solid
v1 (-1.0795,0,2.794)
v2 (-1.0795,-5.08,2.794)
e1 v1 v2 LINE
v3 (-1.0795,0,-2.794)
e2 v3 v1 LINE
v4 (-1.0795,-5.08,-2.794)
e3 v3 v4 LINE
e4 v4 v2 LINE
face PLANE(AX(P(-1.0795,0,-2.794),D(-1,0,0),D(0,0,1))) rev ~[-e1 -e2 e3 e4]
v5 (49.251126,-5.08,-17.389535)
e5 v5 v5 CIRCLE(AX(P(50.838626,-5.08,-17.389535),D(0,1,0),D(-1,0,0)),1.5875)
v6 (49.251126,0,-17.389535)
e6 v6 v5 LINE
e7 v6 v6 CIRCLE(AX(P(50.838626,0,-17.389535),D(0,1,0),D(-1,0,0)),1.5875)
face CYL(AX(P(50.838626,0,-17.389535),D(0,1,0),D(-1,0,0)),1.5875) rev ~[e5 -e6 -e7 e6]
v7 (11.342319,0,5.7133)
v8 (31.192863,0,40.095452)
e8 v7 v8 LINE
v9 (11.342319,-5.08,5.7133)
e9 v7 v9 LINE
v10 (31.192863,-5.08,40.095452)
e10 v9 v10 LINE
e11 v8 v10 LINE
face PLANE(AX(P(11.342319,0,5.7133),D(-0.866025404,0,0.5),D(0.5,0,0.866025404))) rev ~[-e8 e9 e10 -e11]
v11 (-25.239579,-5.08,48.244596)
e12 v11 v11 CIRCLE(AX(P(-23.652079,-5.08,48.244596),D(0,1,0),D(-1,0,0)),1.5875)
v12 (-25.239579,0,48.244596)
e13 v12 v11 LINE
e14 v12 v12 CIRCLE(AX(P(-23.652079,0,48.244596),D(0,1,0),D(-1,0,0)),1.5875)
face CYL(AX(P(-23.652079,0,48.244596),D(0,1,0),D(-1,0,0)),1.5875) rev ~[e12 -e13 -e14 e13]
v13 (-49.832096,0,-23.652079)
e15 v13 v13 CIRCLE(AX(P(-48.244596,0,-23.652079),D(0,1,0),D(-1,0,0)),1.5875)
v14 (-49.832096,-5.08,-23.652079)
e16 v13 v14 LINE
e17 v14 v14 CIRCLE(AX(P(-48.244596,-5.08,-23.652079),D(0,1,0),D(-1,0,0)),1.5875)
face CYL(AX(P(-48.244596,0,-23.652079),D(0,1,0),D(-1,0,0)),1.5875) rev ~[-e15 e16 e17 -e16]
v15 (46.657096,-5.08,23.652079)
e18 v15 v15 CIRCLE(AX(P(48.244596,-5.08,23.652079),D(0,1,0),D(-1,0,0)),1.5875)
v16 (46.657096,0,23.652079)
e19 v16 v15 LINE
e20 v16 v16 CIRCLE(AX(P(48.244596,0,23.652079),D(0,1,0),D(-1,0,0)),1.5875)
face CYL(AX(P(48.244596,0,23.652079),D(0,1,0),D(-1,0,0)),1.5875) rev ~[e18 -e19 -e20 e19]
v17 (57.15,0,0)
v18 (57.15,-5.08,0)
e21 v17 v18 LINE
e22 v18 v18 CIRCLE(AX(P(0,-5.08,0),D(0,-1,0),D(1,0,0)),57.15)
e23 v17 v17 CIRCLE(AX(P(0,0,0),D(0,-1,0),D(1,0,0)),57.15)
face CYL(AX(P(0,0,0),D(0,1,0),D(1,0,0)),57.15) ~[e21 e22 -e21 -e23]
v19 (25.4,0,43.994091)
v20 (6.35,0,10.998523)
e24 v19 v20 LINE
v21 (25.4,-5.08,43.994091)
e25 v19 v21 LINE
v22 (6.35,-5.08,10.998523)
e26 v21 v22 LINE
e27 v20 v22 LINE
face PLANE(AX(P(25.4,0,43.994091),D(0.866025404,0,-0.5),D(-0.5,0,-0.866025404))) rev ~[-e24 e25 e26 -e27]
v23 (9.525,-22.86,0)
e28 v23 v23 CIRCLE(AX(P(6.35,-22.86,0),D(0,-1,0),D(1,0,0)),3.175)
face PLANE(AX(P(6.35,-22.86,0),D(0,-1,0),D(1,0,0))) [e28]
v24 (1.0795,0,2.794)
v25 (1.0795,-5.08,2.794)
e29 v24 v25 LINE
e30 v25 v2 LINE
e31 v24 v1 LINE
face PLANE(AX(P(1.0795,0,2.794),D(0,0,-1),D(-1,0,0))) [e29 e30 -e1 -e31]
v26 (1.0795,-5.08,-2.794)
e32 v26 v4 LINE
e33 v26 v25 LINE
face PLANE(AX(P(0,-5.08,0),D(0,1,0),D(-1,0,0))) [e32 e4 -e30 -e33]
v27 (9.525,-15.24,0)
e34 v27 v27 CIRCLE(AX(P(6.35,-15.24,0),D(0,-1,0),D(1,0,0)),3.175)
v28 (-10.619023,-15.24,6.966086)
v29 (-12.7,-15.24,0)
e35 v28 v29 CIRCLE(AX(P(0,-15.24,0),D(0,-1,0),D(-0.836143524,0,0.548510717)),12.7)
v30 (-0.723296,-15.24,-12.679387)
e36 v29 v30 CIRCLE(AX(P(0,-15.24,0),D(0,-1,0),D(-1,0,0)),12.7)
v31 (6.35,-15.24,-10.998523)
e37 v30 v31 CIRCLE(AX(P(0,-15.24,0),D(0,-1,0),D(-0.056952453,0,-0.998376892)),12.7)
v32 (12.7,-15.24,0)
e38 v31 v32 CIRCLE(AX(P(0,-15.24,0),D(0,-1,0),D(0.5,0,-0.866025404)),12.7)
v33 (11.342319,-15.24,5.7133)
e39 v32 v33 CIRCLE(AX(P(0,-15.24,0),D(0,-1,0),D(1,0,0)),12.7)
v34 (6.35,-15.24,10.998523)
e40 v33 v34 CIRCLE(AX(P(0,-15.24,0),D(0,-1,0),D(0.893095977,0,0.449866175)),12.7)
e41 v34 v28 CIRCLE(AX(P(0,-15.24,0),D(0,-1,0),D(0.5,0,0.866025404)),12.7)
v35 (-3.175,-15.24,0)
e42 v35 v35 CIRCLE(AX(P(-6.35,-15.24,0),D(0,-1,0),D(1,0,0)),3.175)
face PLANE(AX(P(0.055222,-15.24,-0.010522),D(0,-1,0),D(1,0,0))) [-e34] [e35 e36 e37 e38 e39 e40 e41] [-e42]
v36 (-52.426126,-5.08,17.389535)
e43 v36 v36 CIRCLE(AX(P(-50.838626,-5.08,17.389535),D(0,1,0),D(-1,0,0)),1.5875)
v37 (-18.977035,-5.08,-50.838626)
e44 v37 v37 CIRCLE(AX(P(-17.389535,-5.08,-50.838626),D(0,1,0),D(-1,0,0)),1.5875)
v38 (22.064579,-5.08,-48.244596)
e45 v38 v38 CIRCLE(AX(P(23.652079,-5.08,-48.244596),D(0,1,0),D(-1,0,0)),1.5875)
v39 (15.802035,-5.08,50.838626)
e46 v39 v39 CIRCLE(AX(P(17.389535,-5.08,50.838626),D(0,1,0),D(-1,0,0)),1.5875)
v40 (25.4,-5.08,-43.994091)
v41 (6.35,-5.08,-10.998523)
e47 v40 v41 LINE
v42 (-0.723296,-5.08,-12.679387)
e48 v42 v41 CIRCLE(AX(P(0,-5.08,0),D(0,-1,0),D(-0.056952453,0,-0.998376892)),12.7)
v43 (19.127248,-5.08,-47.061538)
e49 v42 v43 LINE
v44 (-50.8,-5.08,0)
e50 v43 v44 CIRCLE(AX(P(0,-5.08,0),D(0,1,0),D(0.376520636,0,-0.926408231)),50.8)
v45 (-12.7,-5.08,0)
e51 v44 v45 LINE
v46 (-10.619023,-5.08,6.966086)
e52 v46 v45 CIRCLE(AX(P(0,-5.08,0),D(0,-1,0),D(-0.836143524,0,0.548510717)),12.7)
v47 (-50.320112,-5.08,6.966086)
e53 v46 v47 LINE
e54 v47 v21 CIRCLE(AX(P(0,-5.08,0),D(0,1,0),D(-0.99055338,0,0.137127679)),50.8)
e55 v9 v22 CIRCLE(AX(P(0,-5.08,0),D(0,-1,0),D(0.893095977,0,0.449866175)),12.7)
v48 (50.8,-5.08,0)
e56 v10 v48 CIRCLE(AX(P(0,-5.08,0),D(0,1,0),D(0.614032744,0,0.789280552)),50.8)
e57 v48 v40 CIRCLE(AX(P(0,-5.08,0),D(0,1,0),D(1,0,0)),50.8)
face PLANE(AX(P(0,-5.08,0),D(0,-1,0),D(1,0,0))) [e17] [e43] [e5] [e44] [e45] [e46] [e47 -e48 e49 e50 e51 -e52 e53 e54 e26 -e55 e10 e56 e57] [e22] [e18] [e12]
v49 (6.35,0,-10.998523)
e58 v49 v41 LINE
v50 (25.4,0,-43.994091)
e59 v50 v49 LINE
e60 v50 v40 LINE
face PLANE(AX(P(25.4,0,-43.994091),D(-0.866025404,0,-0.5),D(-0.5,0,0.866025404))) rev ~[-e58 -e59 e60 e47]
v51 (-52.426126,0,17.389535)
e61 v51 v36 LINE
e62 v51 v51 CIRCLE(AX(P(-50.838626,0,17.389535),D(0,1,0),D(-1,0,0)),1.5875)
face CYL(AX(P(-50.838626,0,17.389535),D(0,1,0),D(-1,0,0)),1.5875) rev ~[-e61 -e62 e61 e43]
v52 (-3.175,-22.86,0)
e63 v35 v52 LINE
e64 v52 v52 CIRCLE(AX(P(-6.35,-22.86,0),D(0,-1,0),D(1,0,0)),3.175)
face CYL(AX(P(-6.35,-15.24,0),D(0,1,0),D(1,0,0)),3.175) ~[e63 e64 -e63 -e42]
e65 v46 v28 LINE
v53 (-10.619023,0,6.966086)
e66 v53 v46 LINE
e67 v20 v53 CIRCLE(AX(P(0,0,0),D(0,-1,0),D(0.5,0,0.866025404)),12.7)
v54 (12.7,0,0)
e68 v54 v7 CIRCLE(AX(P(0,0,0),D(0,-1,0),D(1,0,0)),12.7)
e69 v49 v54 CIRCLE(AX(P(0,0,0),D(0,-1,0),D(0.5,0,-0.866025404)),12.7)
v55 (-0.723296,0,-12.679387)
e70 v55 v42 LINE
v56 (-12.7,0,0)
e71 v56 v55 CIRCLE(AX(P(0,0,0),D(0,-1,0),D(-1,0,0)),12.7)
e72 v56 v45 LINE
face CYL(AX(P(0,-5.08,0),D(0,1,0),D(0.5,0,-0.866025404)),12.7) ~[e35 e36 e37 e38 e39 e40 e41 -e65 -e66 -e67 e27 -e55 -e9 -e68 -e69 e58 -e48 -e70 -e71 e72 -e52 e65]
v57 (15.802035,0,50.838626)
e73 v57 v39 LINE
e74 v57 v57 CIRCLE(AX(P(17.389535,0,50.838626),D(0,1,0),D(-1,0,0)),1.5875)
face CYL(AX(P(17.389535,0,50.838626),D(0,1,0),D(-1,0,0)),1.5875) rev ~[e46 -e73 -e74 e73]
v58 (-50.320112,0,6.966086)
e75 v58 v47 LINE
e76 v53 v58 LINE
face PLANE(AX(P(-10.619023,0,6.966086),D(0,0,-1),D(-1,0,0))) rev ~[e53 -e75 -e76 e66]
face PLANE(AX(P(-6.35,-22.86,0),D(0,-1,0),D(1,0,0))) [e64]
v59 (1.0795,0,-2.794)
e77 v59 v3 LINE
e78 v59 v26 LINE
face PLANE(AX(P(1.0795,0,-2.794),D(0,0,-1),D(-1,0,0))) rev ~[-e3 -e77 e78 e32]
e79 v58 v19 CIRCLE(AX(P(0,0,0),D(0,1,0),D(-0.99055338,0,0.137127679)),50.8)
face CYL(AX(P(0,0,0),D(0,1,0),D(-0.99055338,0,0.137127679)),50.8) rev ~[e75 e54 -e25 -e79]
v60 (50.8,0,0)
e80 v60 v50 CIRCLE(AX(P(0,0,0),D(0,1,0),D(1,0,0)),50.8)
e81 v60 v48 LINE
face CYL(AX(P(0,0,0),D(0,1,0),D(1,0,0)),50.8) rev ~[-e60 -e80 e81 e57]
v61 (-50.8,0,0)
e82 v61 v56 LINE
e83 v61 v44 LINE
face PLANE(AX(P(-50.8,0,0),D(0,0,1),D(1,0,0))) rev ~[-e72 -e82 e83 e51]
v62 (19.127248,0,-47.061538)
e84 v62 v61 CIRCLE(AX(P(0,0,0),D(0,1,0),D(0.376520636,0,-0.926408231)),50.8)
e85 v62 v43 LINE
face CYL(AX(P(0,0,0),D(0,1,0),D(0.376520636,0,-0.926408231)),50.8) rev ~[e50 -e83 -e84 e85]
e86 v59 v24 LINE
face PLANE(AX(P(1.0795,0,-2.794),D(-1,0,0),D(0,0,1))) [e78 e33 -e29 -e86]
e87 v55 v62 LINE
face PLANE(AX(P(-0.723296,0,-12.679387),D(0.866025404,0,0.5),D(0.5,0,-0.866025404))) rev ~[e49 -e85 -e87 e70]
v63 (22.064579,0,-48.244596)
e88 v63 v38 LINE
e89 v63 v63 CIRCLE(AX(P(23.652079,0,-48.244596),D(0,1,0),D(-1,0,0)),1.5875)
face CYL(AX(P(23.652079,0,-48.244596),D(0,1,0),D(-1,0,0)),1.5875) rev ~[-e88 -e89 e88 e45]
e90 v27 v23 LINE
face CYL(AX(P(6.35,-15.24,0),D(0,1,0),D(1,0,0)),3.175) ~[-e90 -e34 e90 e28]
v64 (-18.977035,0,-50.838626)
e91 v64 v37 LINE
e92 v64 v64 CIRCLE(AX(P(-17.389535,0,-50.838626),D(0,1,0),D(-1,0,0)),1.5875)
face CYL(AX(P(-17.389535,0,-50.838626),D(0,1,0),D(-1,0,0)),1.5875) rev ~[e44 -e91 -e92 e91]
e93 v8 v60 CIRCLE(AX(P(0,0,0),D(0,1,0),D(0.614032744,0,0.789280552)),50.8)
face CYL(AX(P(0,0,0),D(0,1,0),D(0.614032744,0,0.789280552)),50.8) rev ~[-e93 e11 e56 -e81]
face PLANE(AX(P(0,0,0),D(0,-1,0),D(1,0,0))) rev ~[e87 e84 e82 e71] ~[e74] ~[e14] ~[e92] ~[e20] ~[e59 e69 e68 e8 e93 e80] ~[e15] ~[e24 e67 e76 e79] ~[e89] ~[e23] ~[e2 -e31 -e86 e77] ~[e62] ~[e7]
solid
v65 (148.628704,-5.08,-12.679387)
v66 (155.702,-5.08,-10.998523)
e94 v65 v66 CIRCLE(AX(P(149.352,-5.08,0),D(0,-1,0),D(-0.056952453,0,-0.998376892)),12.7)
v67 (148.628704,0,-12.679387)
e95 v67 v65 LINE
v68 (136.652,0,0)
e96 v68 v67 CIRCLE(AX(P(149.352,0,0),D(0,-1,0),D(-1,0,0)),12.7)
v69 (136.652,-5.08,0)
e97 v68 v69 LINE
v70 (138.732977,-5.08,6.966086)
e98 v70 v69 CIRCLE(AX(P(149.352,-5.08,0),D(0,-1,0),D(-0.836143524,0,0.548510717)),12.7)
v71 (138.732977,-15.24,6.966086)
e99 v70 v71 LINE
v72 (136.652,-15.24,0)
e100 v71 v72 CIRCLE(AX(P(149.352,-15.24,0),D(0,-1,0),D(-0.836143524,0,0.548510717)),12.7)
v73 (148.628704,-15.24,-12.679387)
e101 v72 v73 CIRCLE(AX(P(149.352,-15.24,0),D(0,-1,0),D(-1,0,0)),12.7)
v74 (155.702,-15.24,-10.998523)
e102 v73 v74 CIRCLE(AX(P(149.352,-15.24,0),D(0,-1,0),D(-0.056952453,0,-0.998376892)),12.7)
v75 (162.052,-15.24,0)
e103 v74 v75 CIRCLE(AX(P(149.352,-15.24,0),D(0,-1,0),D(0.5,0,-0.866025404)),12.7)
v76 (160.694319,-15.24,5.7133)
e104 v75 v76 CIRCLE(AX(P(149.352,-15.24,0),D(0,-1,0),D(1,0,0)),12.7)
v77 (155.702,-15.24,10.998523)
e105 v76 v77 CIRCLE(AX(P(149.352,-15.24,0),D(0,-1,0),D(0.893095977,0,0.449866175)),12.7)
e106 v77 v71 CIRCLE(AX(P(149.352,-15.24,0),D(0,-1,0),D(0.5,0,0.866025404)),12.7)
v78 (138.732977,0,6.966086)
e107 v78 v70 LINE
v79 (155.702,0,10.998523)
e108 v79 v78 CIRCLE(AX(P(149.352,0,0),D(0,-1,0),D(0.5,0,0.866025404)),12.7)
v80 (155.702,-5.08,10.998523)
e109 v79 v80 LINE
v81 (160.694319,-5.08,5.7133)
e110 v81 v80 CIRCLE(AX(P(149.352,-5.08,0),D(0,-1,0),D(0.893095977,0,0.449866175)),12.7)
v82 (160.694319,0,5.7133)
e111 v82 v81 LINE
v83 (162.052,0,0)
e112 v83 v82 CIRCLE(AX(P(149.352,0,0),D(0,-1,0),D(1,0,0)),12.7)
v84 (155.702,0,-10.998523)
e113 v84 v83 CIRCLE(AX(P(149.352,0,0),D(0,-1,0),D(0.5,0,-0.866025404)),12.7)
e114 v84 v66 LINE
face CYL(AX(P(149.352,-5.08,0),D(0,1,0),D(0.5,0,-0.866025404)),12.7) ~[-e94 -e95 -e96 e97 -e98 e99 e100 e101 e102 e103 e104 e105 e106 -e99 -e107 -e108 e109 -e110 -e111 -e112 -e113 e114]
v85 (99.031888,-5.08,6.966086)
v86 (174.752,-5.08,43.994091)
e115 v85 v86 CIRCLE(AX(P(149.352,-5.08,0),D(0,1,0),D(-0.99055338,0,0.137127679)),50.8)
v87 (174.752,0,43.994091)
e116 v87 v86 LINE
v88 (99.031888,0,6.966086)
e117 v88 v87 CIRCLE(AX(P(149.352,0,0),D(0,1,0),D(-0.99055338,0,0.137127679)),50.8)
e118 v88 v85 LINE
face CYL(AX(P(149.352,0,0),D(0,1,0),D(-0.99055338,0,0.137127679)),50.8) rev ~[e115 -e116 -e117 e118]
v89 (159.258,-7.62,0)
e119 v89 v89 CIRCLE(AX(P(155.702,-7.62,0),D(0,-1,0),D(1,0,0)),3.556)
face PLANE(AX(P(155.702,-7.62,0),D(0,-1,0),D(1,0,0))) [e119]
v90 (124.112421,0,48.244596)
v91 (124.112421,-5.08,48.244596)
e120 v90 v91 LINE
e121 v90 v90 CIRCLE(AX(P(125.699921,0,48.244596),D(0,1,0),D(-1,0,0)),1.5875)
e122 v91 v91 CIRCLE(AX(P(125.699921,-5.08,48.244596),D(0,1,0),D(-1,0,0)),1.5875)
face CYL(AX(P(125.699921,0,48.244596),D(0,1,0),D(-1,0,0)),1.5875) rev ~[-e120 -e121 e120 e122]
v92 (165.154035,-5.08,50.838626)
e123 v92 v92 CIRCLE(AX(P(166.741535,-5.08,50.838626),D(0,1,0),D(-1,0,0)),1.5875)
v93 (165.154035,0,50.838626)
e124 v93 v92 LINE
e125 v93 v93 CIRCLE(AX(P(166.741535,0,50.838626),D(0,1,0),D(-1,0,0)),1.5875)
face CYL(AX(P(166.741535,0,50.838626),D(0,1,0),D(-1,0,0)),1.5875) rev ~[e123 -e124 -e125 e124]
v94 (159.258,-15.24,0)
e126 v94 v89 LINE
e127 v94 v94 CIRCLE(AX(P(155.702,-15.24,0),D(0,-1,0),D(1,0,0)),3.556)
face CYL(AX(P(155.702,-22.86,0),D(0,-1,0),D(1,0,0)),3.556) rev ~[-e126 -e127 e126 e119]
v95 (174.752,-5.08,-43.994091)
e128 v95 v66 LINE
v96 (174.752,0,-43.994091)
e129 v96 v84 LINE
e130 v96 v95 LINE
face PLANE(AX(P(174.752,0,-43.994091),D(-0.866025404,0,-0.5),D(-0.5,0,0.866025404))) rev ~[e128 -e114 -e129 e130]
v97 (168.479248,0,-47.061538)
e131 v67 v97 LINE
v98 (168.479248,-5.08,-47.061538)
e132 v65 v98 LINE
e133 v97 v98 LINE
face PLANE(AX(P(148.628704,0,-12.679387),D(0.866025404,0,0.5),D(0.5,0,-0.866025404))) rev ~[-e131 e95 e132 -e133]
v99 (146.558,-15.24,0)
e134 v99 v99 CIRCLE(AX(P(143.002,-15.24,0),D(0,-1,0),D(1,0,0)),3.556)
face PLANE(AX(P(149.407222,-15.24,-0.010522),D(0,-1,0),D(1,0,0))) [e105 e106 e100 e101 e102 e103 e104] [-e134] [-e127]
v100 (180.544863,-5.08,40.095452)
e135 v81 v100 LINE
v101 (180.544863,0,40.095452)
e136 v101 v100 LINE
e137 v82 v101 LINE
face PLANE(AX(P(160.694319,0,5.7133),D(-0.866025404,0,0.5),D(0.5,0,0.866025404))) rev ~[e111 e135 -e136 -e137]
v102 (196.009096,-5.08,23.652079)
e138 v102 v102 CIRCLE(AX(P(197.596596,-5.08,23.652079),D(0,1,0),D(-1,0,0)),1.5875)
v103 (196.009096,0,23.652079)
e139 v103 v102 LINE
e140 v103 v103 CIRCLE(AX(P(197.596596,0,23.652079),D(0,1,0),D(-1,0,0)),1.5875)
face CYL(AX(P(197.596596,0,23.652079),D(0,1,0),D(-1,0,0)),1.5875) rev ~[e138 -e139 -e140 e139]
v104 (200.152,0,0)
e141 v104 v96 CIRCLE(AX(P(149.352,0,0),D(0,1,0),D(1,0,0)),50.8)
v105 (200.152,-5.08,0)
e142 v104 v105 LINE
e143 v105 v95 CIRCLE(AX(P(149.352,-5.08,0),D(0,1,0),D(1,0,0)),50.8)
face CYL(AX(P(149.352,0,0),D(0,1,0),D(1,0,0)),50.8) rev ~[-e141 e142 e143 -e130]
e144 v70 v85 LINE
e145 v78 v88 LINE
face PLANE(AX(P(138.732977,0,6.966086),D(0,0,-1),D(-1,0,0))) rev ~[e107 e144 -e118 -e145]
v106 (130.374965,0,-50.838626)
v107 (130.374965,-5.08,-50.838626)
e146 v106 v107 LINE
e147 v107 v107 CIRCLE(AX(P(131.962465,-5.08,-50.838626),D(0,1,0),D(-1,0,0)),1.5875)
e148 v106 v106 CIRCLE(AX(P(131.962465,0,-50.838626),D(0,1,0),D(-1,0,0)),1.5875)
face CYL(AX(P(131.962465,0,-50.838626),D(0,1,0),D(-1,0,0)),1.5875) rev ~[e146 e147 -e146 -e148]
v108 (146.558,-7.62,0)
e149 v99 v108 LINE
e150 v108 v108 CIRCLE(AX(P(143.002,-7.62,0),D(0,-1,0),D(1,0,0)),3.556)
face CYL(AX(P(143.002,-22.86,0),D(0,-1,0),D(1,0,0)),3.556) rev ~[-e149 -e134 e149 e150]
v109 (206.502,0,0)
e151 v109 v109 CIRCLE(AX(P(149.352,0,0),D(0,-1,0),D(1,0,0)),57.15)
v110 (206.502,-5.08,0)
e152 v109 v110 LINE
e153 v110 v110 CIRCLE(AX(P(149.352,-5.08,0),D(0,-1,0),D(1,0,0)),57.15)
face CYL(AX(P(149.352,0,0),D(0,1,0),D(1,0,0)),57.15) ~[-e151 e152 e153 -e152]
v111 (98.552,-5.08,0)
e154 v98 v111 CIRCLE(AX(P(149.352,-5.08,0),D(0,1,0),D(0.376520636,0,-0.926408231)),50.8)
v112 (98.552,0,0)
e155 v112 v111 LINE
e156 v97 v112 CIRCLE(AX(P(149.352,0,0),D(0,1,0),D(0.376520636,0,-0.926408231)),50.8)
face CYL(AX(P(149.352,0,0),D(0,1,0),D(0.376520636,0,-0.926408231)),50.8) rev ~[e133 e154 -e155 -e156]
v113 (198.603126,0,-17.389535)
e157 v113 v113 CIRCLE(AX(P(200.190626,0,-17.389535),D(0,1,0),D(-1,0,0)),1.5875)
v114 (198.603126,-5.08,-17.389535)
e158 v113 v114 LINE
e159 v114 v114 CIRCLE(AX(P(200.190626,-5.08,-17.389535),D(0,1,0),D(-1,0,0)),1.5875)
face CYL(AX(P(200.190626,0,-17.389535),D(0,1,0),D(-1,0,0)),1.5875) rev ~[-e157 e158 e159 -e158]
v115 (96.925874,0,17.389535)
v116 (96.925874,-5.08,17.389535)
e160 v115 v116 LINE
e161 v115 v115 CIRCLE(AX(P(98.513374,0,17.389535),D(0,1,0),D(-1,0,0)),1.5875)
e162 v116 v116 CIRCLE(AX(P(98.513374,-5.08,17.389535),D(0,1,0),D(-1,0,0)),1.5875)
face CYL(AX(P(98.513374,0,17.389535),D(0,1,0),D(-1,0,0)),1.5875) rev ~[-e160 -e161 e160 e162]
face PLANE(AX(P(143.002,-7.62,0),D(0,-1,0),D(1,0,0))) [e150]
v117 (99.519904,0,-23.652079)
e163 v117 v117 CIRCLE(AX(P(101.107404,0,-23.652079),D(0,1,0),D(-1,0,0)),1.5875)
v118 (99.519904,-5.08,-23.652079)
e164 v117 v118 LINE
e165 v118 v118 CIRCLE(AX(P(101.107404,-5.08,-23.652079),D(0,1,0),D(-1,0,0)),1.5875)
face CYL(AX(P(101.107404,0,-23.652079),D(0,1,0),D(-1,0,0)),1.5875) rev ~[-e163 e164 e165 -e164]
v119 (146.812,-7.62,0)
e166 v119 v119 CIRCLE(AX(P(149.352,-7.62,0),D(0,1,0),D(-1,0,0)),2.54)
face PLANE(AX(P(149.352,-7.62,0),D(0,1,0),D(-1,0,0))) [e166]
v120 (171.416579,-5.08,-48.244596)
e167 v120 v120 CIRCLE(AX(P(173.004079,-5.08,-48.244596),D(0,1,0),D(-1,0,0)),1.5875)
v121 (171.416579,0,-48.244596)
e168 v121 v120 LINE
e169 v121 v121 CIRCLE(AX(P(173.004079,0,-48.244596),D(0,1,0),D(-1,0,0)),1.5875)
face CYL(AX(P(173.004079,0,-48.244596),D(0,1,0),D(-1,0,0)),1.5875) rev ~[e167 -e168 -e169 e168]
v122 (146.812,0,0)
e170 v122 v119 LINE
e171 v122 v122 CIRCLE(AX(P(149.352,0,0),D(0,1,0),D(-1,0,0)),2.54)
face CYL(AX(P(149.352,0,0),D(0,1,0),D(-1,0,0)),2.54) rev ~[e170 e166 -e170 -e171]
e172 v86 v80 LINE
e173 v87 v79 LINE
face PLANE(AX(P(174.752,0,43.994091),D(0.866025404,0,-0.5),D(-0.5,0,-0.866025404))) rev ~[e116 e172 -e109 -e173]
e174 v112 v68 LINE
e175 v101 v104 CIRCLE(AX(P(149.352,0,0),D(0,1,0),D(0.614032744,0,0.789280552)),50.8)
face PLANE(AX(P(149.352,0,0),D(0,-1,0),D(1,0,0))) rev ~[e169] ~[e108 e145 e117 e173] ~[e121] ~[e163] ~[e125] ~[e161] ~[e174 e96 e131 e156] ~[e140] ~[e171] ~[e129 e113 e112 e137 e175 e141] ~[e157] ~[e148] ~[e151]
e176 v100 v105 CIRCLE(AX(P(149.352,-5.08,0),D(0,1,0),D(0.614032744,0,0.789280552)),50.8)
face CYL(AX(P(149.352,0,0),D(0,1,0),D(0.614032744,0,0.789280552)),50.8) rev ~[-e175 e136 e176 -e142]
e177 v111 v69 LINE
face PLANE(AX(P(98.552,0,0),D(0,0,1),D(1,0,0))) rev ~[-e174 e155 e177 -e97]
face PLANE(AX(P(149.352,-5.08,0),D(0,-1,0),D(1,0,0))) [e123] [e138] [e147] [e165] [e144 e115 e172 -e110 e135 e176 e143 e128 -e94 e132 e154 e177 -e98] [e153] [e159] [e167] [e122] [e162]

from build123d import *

# Parameters (mm, degrees)
F0_R      = 57.15
F1_DEPTH  = 5.08
F3_DEPTH  = 10.16
F4_R      = 1.5875
F5_DEPTH  = 25.4
F6_R      = 3.175
F8_DEPTH  = 7.62
F11_R     = 2.54
F12_DEPTH = 7.62
F13_W     = 2.159
F13_H     = 5.588
F14_DEPTH = 5.08
F15_R     = 3.556
F15_R_2   = 3.175
F16_DEPTH = 15.24


# Not quite as in the source:
# - a feature names something its author has since deleted; it is built from what else it names


with BuildPart() as f1:
    # F0 (on Front) → F1 (new body)
    with BuildSketch(Plane.XZ):
        Circle(F0_R)
        with BuildLine():
            ThreePointArc((31.1928633958, 40.095452026), (45.6357177028, 22.3163901594), (50.8, 0))
            ThreePointArc((50.8, 0), (43.9940905122, -25.4), (25.4, -43.9940905122))
            Line((25.4, -43.9940905122), (26.8605, -46.5237507167))
            Line((26.8605, -46.5237507167), (20.8276924685, -50.006793769))
            Line((20.8276924685, -50.006793769), (19.1272483329, -47.0615381305))
            ThreePointArc((19.1272483329, -47.0615381305), (-28.3634957709, -42.1444196502), (-50.8, 0))
            Line((-50.8, 0), (-53.721, 0))
            Line((-53.721, 0), (-53.721, 6.9660861045))
            Line((-53.721, 6.9660861045), (-50.3201117287, 6.9660861045))
            ThreePointArc((-50.3201117287, 6.9660861045), (-22.3163901594, 45.6357177028), (25.4, 43.9940905122))
            Line((25.4, 43.9940905122), (26.8605, 46.5237507167))
            Line((26.8605, 46.5237507167), (32.8933075315, 43.0407076644))
            Line((32.8933075315, 43.0407076644), (31.1928633958, 40.095452026))
        make_face(mode=Mode.SUBTRACT)
        with BuildLine():
            Line((11.3423189116, 5.7133004216), (31.1928633958, 40.095452026))
            ThreePointArc((31.1928633958, 40.095452026), (28.3634957709, 42.1444196502), (25.4, 43.9940905122))
            Line((25.4, 43.9940905122), (6.35, 10.9985226281))
            ThreePointArc((6.35, 10.9985226281), (9.2324390364, 8.7207837629), (11.3423189116, 5.7133004216))
        make_face()
        with BuildLine():
            ThreePointArc((19.1272483329, -47.0615381305), (22.3163901594, -45.6357177028), (25.4, -43.9940905122))
            Line((25.4, -43.9940905122), (6.35, -10.9985226281))
            ThreePointArc((6.35, -10.9985226281), (2.9362007614, -12.3559186259), (-0.7232961513, -12.6793865261))
            Line((-0.7232961513, -12.6793865261), (19.1272483329, -47.0615381305))
        make_face()
        with BuildLine():
            Line((-10.6190227603, 6.9660861045), (-50.3201117287, 6.9660861045))
            ThreePointArc((-50.3201117287, 6.9660861045), (-50.6798859303, 3.4912980526), (-50.8, 0))
            Line((-50.8, 0), (-12.7, 0))
            ThreePointArc((-12.7, 0), (-12.1686397978, 3.635134863), (-10.6190227603, 6.9660861045))
        make_face()
        with BuildLine():
            Line((0, 0), (6.35, 10.9985226281))
            ThreePointArc((6.35, 10.9985226281), (-2.9362007614, 12.3559186259), (-10.6190227603, 6.9660861045))
            Line((-10.6190227603, 6.9660861045), (0, 6.9660861045))
            Line((0, 6.9660861045), (0, 0))
        make_face()
        with BuildLine():
            ThreePointArc((12.7, 0), (12.3559186259, 2.9362007614), (11.3423189116, 5.7133004216))
            Line((11.3423189116, 5.7133004216), (6.0328075315, -3.4830430523))
            Line((6.0328075315, -3.4830430523), (0, 0))
            Line((0, 0), (6.35, -10.9985226281))
            ThreePointArc((6.35, -10.9985226281), (10.9985226281, -6.35), (12.7, 0))
        make_face()
        with BuildLine():
            ThreePointArc((-12.7, 0), (-9.2324390364, -8.7207837629), (-0.7232961513, -12.6793865261))
            Line((-0.7232961513, -12.6793865261), (-6.0328075315, -3.4830430523))
            Line((-6.0328075315, -3.4830430523), (0, 0))
            Line((0, 0), (-12.7, 0))
        make_face()
        with BuildLine():
            Line((-12.7, 0), (0, 0))
            Line((0, 0), (0, 6.9660861045))
            Line((0, 6.9660861045), (-10.6190227603, 6.9660861045))
            ThreePointArc((-10.6190227603, 6.9660861045), (-12.1686397978, 3.635134863), (-12.7, 0))
        make_face()
        with BuildLine():
            Line((6.0328075315, -3.4830430523), (11.3423189116, 5.7133004216))
            ThreePointArc((11.3423189116, 5.7133004216), (9.2324390364, 8.7207837629), (6.35, 10.9985226281))
            Line((6.35, 10.9985226281), (0, 0))
            Line((0, 0), (6.0328075315, -3.4830430523))
        make_face()
        with BuildLine():
            ThreePointArc((-0.7232961513, -12.6793865261), (2.9362007614, -12.3559186259), (6.35, -10.9985226281))
            Line((6.35, -10.9985226281), (0, 0))
            Line((0, 0), (-6.0328075315, -3.4830430523))
            Line((-6.0328075315, -3.4830430523), (-0.7232961513, -12.6793865261))
        make_face()
        with BuildLine():
            ThreePointArc((25.4, 43.9940905122), (28.3634957709, 42.1444196502), (31.1928633958, 40.095452026))
            Line((31.1928633958, 40.095452026), (32.8933075315, 43.0407076644))
            Line((32.8933075315, 43.0407076644), (26.8605, 46.5237507167))
            Line((26.8605, 46.5237507167), (25.4, 43.9940905122))
        make_face()
        with BuildLine():
            Line((26.8605, -46.5237507167), (25.4, -43.9940905122))
            ThreePointArc((25.4, -43.9940905122), (22.3163901594, -45.6357177028), (19.1272483329, -47.0615381305))
            Line((19.1272483329, -47.0615381305), (20.8276924685, -50.006793769))
            Line((20.8276924685, -50.006793769), (26.8605, -46.5237507167))
        make_face()
        with BuildLine():
            ThreePointArc((-50.8, 0), (-50.6798859303, 3.4912980526), (-50.3201117287, 6.9660861045))
            Line((-50.3201117287, 6.9660861045), (-53.721, 6.9660861045))
            Line((-53.721, 6.9660861045), (-53.721, 0))
            Line((-53.721, 0), (-50.8, 0))
        make_face()
    extrude(amount=F1_DEPTH)

    # F2 (on face) → F3 (join)
    with BuildSketch(Plane.XZ.offset(5.08)):
        with BuildLine():
            ThreePointArc((6.35, -10.9985226281), (10.9985226281, -6.35), (12.7, 0))
            ThreePointArc((12.7, 0), (12.3559186259, 2.9362007614), (11.3423189116, 5.7133004216))
            ThreePointArc((11.3423189116, 5.7133004216), (9.2324390364, 8.7207837629), (6.35, 10.9985226281))
            ThreePointArc((6.35, 10.9985226281), (-2.9362007614, 12.3559186259), (-10.6190227603, 6.9660861045))
            ThreePointArc((-10.6190227603, 6.9660861045), (-12.1686397978, 3.635134863), (-12.7, 0))
            ThreePointArc((-12.7, 0), (-9.2324390364, -8.7207837629), (-0.7232961513, -12.6793865261))
            ThreePointArc((-0.7232961513, -12.6793865261), (2.9362007614, -12.3559186259), (6.35, -10.9985226281))
        make_face()
    extrude(amount=F3_DEPTH)

    # F4 (on face) → F5 (cut)
    with BuildSketch(Plane(origin=(0, 0, 0), x_dir=(-1, 0, 0), z_dir=(0, 1, 0))):
        with Locations((-23.6520785838, -48.2445955276)):
            Circle(F4_R)
        with Locations((-50.838625809, -17.3895354974)):
            Circle(F4_R)
        with Locations((-48.2445955276, 23.6520785838)):
            Circle(F4_R)
        with Locations((-17.3895354974, 50.838625809)):
            Circle(F4_R)
        with Locations((23.6520785838, 48.2445955276)):
            Circle(F4_R)
        with Locations((50.838625809, 17.3895354974)):
            Circle(F4_R)
        with Locations((48.2445955276, -23.6520785838)):
            Circle(F4_R)
        with Locations((17.3895354974, -50.838625809)):
            Circle(F4_R)
    extrude(amount=-F5_DEPTH, mode=Mode.SUBTRACT)


with BuildPart() as f7_1:
    # F7: copy of F1
    add(f1.part.moved(Location((177.292, 0, 0))))


with BuildPart() as f1_1:
    add(f1.part)

    # F6 (on face) → F8 (join)
    with BuildSketch(Plane.XZ.offset(15.24)):
        with Locations((-6.35, 0)):
            Circle(F6_R)
        with BuildLine():
            ThreePointArc((3.175, 0), (6.35, -3.175), (9.525, 0))
            ThreePointArc((9.525, 0), (6.35, 3.175), (3.175, 0))
        make_face()
    extrude(amount=F8_DEPTH)


with BuildPart() as f10_1:
    # F10: copy of F1
    add(f1_1.part.moved(Location((149.352, 0, 0))))

    # F11 (on face) → F12 (cut)
    with BuildSketch(Plane(origin=(0, 0, 0), x_dir=(-1, 0, 0), z_dir=(0, 1, 0))):
        with Locations((-149.352, 0)):
            Circle(F11_R)
    extrude(amount=-F12_DEPTH, mode=Mode.SUBTRACT)

    # F15 (on face) → F16 (cut)
    with BuildSketch(Plane.XZ.offset(22.86)):
        with Locations((155.702, 0)):
            Circle(F15_R)
        with Locations((155.702, 0)):
            Circle(F15_R_2, mode=Mode.SUBTRACT)
        with Locations((143.002, 0)):
            Circle(F15_R)
        with Locations((155.702, 0)):
            Circle(F15_R_2)
        with Locations((6.35, 0)):
            Circle(F15_R_2)
    extrude(amount=-F16_DEPTH, mode=Mode.SUBTRACT)


with BuildPart() as f1_2:
    add(f1_1.part)

    # F13 (on face) → F14 (cut)
    with BuildSketch(Plane(origin=(0, 0, 0), x_dir=(-1, 0, 0), z_dir=(0, 1, 0))):
        Rectangle(F13_W, F13_H)
    extrude(amount=-F14_DEPTH, mode=Mode.SUBTRACT)


solid = Compound([f10_1.part, f1_2.part])
